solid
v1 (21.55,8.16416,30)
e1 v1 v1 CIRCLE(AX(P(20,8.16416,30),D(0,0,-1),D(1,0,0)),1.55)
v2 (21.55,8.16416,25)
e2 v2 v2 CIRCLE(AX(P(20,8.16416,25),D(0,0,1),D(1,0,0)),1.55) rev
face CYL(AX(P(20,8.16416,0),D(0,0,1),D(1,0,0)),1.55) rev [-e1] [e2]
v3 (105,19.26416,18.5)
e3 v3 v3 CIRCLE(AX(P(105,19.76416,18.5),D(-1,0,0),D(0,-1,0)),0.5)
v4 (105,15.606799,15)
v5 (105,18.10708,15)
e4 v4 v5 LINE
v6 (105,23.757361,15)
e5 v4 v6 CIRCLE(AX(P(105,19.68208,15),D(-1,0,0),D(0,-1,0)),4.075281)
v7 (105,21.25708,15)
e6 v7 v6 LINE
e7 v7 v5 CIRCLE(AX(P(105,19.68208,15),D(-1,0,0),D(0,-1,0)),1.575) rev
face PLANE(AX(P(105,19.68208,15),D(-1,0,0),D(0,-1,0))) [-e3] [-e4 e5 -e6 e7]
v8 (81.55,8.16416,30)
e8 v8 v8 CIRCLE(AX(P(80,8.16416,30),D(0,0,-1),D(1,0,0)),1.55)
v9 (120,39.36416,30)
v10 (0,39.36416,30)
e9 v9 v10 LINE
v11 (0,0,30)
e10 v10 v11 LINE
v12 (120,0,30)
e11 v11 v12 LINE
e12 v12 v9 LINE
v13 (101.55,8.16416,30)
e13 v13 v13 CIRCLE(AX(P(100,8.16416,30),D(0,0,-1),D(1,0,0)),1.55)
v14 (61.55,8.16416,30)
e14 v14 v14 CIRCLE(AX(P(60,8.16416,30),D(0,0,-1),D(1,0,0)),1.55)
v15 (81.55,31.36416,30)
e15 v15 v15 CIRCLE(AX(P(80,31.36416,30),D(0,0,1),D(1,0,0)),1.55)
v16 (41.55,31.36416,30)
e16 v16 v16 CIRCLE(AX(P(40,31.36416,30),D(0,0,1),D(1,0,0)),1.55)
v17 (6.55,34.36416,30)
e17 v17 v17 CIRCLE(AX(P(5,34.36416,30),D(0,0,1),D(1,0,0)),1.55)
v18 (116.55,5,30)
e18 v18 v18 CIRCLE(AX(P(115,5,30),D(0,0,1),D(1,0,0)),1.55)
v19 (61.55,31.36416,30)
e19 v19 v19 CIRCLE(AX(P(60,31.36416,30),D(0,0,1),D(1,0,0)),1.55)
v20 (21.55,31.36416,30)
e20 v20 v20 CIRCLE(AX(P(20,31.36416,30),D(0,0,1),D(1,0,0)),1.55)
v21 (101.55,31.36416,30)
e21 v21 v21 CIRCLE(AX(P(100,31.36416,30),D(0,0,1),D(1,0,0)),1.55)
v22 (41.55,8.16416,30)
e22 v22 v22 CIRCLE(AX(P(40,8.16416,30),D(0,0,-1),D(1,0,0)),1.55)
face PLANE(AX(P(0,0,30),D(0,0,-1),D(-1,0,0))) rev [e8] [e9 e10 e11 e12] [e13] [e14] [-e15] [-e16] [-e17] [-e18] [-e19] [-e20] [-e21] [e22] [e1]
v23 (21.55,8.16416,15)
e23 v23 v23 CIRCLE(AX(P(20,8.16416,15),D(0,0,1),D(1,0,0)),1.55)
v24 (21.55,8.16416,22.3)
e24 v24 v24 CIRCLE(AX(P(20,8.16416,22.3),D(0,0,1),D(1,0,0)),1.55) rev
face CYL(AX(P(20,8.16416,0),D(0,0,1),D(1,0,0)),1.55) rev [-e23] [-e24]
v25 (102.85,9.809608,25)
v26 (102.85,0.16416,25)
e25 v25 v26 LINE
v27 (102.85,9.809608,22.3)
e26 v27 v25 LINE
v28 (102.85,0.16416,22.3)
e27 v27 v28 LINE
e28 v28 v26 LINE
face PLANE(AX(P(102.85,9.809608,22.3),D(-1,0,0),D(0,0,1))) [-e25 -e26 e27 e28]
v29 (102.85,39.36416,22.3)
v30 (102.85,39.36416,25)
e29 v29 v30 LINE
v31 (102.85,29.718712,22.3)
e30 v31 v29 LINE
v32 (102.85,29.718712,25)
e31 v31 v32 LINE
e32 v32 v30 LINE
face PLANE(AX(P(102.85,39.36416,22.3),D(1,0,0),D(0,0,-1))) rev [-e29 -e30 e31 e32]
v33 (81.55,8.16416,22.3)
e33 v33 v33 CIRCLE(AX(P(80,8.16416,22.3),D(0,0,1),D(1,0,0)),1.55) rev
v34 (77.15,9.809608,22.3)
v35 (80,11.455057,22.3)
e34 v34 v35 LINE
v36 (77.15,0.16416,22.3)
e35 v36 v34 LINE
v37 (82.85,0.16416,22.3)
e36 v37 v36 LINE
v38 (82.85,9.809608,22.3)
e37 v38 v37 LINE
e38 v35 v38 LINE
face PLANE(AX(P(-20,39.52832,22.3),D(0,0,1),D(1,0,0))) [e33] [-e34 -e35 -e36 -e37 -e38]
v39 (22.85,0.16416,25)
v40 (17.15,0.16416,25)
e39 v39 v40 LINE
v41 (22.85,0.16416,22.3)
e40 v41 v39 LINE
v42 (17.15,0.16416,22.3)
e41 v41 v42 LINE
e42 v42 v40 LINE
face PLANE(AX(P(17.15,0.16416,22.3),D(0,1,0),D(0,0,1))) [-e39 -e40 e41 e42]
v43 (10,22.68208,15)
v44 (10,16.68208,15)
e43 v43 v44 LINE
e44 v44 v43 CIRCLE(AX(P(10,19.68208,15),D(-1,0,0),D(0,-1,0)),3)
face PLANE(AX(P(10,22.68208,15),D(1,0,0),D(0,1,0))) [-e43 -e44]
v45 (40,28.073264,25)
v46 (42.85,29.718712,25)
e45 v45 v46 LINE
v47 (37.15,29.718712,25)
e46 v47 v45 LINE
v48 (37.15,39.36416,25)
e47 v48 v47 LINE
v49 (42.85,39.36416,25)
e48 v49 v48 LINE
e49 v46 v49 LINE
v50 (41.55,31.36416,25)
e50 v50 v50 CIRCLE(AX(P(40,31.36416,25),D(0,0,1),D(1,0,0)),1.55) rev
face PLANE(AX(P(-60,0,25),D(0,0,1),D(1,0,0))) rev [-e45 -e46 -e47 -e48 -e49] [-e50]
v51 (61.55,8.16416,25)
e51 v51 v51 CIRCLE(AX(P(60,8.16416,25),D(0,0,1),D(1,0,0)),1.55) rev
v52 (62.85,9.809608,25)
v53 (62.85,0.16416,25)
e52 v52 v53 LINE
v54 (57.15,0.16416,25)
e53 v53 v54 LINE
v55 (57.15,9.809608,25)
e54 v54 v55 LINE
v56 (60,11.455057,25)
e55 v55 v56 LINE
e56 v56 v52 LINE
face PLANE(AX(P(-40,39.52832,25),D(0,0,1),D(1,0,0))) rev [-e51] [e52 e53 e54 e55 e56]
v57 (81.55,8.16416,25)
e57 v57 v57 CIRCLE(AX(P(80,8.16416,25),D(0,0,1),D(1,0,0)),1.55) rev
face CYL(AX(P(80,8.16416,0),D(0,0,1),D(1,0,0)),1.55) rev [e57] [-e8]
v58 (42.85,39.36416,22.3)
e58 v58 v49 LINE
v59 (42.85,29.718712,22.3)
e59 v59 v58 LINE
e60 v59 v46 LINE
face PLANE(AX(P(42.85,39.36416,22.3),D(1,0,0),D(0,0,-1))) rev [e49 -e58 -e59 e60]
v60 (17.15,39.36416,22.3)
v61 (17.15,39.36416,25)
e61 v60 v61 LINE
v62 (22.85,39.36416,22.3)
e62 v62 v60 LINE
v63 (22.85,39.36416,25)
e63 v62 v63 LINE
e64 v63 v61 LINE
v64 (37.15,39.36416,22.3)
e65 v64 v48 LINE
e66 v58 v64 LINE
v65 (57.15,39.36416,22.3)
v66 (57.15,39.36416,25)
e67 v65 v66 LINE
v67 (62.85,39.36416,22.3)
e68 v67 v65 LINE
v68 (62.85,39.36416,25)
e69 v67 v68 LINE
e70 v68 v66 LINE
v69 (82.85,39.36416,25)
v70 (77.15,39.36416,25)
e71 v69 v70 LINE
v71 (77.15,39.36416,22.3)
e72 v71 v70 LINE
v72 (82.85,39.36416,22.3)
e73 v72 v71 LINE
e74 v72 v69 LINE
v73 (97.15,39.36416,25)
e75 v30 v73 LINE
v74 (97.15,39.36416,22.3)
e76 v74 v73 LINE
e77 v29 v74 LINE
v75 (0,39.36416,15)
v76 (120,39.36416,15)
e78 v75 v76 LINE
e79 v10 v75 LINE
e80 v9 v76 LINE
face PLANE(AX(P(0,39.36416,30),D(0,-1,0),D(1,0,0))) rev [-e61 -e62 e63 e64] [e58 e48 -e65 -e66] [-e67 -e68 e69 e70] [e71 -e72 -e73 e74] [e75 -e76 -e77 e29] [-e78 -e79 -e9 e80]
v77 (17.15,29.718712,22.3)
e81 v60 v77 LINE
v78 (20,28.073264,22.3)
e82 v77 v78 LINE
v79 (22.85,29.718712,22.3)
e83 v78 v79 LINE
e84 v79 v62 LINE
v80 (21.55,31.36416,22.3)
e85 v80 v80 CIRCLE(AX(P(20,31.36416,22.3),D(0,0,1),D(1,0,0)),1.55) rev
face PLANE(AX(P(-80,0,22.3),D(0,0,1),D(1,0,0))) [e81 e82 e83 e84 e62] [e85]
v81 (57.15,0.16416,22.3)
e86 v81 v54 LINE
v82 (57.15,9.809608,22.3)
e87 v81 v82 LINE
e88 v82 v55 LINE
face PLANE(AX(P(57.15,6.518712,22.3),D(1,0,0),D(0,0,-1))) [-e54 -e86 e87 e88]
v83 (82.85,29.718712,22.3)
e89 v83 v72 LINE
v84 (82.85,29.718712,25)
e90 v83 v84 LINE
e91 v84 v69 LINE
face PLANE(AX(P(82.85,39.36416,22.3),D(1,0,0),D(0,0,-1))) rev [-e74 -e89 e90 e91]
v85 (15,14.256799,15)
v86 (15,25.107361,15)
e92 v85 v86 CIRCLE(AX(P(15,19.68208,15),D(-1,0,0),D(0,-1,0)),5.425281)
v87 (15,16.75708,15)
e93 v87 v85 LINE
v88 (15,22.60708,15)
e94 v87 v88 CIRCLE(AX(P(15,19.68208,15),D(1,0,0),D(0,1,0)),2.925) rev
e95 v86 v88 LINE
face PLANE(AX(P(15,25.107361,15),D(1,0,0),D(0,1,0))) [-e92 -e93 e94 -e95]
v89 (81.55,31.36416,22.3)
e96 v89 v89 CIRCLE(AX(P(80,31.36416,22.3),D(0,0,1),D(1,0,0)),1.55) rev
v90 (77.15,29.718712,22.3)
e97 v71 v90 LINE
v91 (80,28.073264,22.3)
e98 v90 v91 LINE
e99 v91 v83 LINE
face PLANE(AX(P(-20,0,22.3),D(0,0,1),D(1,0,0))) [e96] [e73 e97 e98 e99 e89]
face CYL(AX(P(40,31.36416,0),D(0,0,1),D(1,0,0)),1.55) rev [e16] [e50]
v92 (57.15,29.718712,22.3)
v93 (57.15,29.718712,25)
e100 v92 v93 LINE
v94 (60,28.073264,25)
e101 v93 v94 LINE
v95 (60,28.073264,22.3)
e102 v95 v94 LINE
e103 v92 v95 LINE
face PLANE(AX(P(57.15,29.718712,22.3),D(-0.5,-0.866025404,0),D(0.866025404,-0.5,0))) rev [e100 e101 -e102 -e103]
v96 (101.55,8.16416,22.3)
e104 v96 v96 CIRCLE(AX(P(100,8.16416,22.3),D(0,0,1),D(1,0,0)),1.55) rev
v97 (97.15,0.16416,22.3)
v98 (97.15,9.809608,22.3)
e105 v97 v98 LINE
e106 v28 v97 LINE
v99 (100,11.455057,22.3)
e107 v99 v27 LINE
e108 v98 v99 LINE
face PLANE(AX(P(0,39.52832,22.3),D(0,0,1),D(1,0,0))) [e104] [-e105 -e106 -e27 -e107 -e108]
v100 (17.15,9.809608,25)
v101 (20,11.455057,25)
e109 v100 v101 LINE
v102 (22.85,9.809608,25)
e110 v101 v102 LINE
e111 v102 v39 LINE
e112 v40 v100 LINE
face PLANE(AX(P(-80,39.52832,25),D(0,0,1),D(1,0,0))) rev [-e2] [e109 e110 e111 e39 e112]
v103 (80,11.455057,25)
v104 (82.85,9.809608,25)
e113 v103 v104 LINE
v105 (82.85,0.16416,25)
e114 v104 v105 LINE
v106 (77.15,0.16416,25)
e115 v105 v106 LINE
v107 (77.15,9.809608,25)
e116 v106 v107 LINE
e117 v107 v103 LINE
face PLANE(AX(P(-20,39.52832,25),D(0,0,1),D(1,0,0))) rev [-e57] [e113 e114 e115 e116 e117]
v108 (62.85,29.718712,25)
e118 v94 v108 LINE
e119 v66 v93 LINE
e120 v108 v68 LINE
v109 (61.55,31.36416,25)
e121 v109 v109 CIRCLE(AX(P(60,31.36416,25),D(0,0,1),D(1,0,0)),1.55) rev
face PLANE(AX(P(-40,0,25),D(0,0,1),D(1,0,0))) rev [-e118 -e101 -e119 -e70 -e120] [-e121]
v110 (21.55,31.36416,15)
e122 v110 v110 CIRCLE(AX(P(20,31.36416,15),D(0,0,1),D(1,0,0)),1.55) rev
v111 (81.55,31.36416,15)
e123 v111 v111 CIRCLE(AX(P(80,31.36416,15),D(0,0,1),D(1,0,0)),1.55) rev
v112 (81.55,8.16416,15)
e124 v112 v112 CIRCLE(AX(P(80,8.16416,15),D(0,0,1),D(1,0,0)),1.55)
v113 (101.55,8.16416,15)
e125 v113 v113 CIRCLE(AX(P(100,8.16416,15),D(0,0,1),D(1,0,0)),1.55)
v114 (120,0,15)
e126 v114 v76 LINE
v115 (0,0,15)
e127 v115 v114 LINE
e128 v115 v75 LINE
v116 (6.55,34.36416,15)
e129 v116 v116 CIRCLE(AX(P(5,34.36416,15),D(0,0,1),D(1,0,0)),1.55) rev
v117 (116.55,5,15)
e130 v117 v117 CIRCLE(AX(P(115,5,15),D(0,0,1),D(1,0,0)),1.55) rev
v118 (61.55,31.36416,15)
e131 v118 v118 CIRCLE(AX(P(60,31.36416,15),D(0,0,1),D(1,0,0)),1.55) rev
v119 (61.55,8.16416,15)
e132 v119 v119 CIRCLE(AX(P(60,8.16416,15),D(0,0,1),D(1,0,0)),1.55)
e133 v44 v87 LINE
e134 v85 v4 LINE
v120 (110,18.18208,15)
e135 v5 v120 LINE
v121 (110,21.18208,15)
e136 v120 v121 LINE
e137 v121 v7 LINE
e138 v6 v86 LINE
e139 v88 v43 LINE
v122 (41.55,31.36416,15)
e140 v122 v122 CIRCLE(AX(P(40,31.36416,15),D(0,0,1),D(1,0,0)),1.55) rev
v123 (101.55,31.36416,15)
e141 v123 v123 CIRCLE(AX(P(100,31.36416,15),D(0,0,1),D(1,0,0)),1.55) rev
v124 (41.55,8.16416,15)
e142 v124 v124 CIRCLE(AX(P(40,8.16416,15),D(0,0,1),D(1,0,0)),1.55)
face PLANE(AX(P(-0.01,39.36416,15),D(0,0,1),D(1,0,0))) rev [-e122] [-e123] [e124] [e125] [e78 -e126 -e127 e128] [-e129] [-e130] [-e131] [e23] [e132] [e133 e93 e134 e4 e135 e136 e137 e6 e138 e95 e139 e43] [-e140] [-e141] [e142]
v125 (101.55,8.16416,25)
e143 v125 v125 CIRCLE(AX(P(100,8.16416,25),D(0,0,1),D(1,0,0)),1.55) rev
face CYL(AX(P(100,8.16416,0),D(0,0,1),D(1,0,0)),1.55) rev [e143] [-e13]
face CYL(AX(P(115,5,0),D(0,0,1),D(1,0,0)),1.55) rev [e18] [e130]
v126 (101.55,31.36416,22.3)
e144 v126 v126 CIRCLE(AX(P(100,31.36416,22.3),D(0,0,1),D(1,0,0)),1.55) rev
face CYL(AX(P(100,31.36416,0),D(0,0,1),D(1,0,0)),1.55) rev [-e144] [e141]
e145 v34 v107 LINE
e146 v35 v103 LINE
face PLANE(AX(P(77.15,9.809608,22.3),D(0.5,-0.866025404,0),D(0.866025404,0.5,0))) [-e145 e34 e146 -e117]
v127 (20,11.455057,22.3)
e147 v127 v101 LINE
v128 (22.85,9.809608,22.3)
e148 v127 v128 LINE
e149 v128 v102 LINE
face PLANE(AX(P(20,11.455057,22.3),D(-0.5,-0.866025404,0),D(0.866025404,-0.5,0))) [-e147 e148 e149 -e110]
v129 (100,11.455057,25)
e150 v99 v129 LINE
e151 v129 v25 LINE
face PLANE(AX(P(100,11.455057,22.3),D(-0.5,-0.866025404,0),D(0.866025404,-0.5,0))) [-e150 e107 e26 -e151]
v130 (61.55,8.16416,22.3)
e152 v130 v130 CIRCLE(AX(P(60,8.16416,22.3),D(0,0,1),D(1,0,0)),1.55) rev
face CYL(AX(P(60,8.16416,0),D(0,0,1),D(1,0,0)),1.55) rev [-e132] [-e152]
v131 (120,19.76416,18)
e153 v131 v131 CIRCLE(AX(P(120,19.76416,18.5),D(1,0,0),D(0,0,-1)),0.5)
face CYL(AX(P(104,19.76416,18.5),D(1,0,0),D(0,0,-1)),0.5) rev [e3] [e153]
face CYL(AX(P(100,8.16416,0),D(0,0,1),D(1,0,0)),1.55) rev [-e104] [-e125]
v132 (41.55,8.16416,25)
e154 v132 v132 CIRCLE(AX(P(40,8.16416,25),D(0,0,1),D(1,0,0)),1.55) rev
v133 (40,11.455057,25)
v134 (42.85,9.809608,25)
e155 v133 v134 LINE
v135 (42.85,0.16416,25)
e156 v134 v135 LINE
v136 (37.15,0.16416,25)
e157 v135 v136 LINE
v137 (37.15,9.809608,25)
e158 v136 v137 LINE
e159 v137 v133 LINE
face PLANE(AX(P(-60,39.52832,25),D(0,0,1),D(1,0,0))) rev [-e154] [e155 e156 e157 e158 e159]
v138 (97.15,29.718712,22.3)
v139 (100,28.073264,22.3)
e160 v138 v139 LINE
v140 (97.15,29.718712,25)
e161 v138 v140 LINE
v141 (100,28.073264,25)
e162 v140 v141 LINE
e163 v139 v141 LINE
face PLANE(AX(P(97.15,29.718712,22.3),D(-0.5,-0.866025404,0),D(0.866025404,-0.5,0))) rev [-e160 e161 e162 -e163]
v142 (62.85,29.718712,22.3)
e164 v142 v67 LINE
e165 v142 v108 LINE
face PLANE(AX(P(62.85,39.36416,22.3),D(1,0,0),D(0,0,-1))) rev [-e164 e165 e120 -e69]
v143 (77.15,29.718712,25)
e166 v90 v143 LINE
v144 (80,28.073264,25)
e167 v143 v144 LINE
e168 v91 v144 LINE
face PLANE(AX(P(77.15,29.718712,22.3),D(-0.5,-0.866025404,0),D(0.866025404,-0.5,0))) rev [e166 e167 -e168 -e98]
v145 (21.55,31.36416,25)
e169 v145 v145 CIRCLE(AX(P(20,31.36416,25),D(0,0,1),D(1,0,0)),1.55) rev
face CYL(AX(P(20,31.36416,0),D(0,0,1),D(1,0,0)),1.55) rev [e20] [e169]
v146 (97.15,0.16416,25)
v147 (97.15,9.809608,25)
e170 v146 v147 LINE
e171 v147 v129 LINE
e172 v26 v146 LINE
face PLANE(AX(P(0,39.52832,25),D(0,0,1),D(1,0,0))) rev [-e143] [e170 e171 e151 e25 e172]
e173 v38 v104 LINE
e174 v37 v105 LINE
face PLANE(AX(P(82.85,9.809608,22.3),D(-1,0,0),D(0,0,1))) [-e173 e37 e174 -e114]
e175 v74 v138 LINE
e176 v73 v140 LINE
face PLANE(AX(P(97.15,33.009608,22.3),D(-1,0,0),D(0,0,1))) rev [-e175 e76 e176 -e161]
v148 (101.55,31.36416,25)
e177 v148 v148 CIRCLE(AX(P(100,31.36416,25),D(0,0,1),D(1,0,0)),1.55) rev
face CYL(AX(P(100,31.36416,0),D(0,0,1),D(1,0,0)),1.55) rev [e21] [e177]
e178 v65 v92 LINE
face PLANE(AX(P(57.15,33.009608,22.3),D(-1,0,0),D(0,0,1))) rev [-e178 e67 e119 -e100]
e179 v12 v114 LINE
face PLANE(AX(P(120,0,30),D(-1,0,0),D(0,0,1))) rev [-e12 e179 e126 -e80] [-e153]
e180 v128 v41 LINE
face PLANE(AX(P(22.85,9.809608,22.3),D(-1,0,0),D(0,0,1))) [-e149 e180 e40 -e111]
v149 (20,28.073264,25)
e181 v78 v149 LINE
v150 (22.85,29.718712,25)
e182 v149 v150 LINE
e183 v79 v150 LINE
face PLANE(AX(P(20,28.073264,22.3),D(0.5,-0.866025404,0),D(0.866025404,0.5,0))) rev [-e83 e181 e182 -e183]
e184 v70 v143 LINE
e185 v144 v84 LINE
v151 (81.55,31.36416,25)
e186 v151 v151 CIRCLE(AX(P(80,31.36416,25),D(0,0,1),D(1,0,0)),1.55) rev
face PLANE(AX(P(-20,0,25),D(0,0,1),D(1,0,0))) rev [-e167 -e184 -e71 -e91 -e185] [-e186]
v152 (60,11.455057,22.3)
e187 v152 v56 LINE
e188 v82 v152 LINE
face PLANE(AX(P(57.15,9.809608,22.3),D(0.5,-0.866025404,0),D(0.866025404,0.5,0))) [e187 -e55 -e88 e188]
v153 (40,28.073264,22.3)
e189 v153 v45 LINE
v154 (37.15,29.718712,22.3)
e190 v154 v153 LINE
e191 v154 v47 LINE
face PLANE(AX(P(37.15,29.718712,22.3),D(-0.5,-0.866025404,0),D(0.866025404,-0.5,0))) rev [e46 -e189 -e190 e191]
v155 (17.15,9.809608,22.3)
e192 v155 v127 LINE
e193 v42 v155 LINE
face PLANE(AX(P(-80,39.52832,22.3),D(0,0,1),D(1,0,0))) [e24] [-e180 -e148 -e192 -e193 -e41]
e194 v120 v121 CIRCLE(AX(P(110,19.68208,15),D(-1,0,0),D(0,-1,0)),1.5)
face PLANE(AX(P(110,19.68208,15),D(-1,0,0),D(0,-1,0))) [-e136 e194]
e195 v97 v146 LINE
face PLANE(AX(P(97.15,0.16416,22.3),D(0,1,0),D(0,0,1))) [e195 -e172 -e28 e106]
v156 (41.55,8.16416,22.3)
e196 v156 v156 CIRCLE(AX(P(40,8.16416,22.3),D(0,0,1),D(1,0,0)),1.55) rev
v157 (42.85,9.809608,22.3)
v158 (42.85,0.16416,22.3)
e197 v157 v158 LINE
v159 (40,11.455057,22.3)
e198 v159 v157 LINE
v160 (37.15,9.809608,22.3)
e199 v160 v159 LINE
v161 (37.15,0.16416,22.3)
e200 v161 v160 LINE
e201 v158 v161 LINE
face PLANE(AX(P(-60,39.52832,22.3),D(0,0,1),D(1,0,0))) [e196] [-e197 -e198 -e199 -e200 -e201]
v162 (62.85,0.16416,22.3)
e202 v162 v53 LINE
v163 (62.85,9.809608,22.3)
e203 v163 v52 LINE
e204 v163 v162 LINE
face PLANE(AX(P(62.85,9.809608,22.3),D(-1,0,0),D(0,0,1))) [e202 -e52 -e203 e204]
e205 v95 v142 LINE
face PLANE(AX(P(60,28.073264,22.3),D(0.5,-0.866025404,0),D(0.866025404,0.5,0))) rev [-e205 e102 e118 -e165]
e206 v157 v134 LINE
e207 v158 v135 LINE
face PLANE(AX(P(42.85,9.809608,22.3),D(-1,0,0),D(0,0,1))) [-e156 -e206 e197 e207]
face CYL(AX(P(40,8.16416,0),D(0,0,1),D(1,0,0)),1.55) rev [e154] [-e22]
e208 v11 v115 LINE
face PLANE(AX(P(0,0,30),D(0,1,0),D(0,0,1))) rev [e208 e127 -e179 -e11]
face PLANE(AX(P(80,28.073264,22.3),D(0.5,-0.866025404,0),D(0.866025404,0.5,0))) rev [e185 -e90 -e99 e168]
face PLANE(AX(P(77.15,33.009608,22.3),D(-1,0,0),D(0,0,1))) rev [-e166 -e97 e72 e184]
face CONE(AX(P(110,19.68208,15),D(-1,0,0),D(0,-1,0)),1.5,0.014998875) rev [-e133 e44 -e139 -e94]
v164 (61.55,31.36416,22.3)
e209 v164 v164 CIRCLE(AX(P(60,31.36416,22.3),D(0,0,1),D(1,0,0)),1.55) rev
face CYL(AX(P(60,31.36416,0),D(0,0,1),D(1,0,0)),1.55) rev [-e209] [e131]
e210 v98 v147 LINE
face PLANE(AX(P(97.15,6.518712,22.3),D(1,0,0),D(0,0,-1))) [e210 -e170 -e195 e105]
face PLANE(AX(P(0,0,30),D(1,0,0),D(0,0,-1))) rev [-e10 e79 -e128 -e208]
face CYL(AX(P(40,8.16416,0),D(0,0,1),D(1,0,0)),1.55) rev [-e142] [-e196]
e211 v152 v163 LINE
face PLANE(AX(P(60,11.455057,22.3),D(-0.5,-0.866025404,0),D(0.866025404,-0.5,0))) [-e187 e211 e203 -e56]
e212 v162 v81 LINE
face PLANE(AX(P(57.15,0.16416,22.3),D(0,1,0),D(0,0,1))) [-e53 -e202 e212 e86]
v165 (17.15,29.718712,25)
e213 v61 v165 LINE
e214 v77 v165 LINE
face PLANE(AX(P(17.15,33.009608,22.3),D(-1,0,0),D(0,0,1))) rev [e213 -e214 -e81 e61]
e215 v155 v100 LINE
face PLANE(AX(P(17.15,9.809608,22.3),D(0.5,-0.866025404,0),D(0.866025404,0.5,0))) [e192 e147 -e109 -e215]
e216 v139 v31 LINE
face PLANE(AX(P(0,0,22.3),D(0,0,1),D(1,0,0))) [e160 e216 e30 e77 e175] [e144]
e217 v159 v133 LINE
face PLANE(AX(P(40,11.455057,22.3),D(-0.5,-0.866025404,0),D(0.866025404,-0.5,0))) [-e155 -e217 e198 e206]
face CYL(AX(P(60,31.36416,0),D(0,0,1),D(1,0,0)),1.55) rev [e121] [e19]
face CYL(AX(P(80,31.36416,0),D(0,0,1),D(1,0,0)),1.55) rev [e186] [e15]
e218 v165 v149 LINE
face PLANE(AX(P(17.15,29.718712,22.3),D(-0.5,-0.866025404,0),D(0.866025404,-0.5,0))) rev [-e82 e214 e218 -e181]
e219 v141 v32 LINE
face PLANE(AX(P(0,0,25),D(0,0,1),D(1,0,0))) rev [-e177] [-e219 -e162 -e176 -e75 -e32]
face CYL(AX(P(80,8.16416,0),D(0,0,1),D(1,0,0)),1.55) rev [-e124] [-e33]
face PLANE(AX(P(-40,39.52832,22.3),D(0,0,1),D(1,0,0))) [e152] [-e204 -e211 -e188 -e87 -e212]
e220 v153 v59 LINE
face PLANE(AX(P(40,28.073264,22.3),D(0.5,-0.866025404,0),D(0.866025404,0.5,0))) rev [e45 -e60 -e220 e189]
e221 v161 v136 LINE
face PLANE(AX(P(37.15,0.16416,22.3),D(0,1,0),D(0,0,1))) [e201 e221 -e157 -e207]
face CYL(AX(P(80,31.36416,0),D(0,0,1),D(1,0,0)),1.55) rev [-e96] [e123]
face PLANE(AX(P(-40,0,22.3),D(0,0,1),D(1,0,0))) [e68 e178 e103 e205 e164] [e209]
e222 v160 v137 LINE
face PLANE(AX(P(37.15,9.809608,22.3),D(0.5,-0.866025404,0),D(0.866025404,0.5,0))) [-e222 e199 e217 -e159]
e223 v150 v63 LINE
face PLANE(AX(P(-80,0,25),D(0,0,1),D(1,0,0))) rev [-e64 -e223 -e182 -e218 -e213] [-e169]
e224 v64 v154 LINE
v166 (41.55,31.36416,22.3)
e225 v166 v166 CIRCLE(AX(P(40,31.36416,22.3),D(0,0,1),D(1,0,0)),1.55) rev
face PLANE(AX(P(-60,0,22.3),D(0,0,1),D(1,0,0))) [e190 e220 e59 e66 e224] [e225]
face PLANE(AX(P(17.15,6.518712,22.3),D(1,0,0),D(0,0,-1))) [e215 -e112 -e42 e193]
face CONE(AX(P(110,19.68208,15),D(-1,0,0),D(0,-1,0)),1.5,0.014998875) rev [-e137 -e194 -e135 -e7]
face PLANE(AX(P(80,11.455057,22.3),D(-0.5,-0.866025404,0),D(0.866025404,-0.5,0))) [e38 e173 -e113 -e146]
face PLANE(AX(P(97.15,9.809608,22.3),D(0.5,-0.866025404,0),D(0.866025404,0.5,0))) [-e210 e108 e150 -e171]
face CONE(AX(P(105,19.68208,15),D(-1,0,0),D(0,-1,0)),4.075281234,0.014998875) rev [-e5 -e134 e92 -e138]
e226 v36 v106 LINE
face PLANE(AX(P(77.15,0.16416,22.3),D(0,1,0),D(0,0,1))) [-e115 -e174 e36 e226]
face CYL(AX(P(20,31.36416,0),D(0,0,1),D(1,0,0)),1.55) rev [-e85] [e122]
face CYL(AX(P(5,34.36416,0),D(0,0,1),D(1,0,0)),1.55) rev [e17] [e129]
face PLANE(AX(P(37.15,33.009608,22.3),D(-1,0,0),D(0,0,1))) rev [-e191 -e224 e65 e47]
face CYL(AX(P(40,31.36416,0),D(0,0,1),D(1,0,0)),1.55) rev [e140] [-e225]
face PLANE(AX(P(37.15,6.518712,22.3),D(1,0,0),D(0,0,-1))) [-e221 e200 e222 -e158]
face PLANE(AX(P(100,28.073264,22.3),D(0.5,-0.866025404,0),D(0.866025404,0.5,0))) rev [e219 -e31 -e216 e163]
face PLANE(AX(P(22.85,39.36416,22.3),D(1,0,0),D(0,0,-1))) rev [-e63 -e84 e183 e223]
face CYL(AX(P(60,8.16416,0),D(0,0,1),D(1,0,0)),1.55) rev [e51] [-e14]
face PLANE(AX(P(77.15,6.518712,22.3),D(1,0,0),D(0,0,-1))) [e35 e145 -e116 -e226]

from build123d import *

# Parameters (mm, degrees)
SKIZZE2_W                        = 120
SKIZZE2_H                        = 39.364160046
AUFSATZ_LINEAR_AUSTRAGEN1_DEPTH  = 30
SKIZZE24_R                       = 1.55
SCHNITT_LINEAR_AUSTRAGEN4_DEPTH  = 130.805766806
SKIZZE46_R                       = 2.85
SCHNITT_LINEAR_AUSTRAGEN15_DEPTH = 10
SCHNITT_LINEAR_START             = -5
SCHNITT_LINEAR_AUSTRAGEN25_DEPTH = 2.7
LINEARES_MUSTER1_COUNT           = 5
LINEARES_MUSTER1_PITCH           = 20
SPIEGELN2_COPY_1_SKETCH_R        = 2.85
SPIEGELN2_COPY_1_DEPTH           = 10
SPIEGELN2_COPY_2_SKETCH_R        = 2.85
SPIEGELN2_COPY_2_DEPTH           = 10
SPIEGELN2_COPY_3_SKETCH_R        = 2.85
SPIEGELN2_COPY_3_DEPTH           = 10
SPIEGELN2_COPY_4_SKETCH_R        = 2.85
SPIEGELN2_COPY_4_DEPTH           = 10
SPIEGELN2_START                  = -5
SPIEGELN2_COPY_5_DEPTH           = 2.7
SPIEGELN2_COPY_6_DEPTH           = 2.7
SPIEGELN2_COPY_7_DEPTH           = 2.7
SPIEGELN2_COPY_8_DEPTH           = 2.7
SKIZZE51_R                       = 1.55
SCHNITT_LINEAR_AUSTRAGEN26_DEPTH = 130.805766806
SKIZZE67_R                       = 0.5
SCHNITT_LINEAR_AUSTRAGEN28_DEPTH = 16
SKIZZE68_R                       = 0.65
SCHNITT_LINEAR_AUSTRAGEN30_DEPTH = 16
SKIZZE70_R                       = 2
SCHNITT_LINEAR_AUSTRAGEN31_DEPTH = 6
ABSPALTEN3_OUTLINE_W             = 120
ABSPALTEN3_OUTLINE_H             = 39.364160046
ABSPALTEN3_OUTLINE_R             = 1.55
ABSPALTEN3_DEPTH                 = 15


# Read off the part's stored shape, not the designer's step: Abspalten3
with BuildPart() as part:
    # Skizze2 → Aufsatz-Linear austragen1 (new body)
    with BuildSketch(Plane.XY):
        with Locations((60, 19.682080023)):
            Rectangle(SKIZZE2_W, SKIZZE2_H)
    extrude(amount=AUFSATZ_LINEAR_AUSTRAGEN1_DEPTH)

    # Skizze24 → Schnitt-Linear austragen4 (cut, through all)
    with BuildSketch(Plane.XY.offset(30)):
        with Locations((20, 31.364160046)):
            Circle(SKIZZE24_R)
        with Locations((40, 31.364160046)):
            Circle(SKIZZE24_R)
        with Locations((60, 31.364160046)):
            Circle(SKIZZE24_R)
        with Locations((80, 31.364160046)):
            Circle(SKIZZE24_R)
        with Locations((100, 31.364160046)):
            Circle(SKIZZE24_R)
    schnitt_linear_austragen4 = extrude(amount=-SCHNITT_LINEAR_AUSTRAGEN4_DEPTH, mode=Mode.SUBTRACT)

    # Skizze46 → Schnitt-Linear austragen15 (cut)
    with BuildSketch(Plane(origin=(0, 0, 0), x_dir=(-1, 0, 0), z_dir=(0, 0, -1))):
        with Locations((-100, 31.364160046)):
            Circle(SKIZZE46_R)
    schnitt_linear_austragen15 = extrude(amount=-SCHNITT_LINEAR_AUSTRAGEN15_DEPTH, mode=Mode.SUBTRACT)

    # Skizze50 → Schnitt-Linear austragen25 (cut)
    with BuildSketch(Plane.XY.offset(30).offset(SCHNITT_LINEAR_START)):
        Polygon((97.15, 33.009608314), (97.15, 39.364160046), (102.85, 39.364160046), (102.85, 33.009608314), (102.85, 29.718711779), (100, 28.073263512), (97.15, 29.718711779), align=None)
    schnitt_linear_austragen25 = extrude(amount=-SCHNITT_LINEAR_AUSTRAGEN25_DEPTH, mode=Mode.SUBTRACT)

    # Lineares Muster1: Schnitt-Linear austragen15, Schnitt-Linear austragen25 ×5
    with Locations(*[(-i * LINEARES_MUSTER1_PITCH, 0, 0) for i in range(1, LINEARES_MUSTER1_COUNT)]):
        add(schnitt_linear_austragen15, mode=Mode.SUBTRACT)
        add(schnitt_linear_austragen25, mode=Mode.SUBTRACT)

    # Spiegeln2: Schnitt-Linear austragen15, Schnitt-Linear austragen25 across plane
    add(schnitt_linear_austragen15.mirror(Plane.ZX.offset(19.764160046)), mode=Mode.SUBTRACT)
    add(schnitt_linear_austragen25.mirror(Plane.ZX.offset(19.764160046)), mode=Mode.SUBTRACT)

    # Spiegeln2 copy 1 sketch → Spiegeln2 copy 1 (cut)
    with BuildSketch(Plane(origin=(-20, 39.528320093, 0), x_dir=(-1, 0, 0), z_dir=(0, 0, -1))):
        with Locations((-100, -31.364160046)):
            Circle(SPIEGELN2_COPY_1_SKETCH_R)
    extrude(amount=-SPIEGELN2_COPY_1_DEPTH, mode=Mode.SUBTRACT)

    # Spiegeln2 copy 2 sketch → Spiegeln2 copy 2 (cut)
    with BuildSketch(Plane(origin=(-40, 39.528320093, 0), x_dir=(-1, 0, 0), z_dir=(0, 0, -1))):
        with Locations((-100, -31.364160046)):
            Circle(SPIEGELN2_COPY_2_SKETCH_R)
    extrude(amount=-SPIEGELN2_COPY_2_DEPTH, mode=Mode.SUBTRACT)

    # Spiegeln2 copy 3 sketch → Spiegeln2 copy 3 (cut)
    with BuildSketch(Plane(origin=(-60, 39.528320093, 0), x_dir=(-1, 0, 0), z_dir=(0, 0, -1))):
        with Locations((-100, -31.364160046)):
            Circle(SPIEGELN2_COPY_3_SKETCH_R)
    extrude(amount=-SPIEGELN2_COPY_3_DEPTH, mode=Mode.SUBTRACT)

    # Spiegeln2 copy 4 sketch → Spiegeln2 copy 4 (cut)
    with BuildSketch(Plane(origin=(-80, 39.528320093, 0), x_dir=(-1, 0, 0), z_dir=(0, 0, -1))):
        with Locations((-100, -31.364160046)):
            Circle(SPIEGELN2_COPY_4_SKETCH_R)
    extrude(amount=-SPIEGELN2_COPY_4_DEPTH, mode=Mode.SUBTRACT)

    # Spiegeln2 copy 5 sketch → Spiegeln2 copy 5 (cut)
    with BuildSketch(Plane(origin=(-20, 39.528320093, 30), x_dir=(1, 0, 0), z_dir=(0, 0, 1)).offset(SPIEGELN2_START)):
        Polygon((97.15, -33.009608314), (97.15, -39.364160046), (102.85, -39.364160046), (102.85, -33.009608314), (102.85, -29.718711779), (100, -28.073263512), (97.15, -29.718711779), align=None)
    extrude(amount=-SPIEGELN2_COPY_5_DEPTH, mode=Mode.SUBTRACT)

    # Spiegeln2 copy 6 sketch → Spiegeln2 copy 6 (cut)
    with BuildSketch(Plane(origin=(-40, 39.528320093, 30), x_dir=(1, 0, 0), z_dir=(0, 0, 1)).offset(SPIEGELN2_START)):
        Polygon((97.15, -33.009608314), (97.15, -39.364160046), (102.85, -39.364160046), (102.85, -33.009608314), (102.85, -29.718711779), (100, -28.073263512), (97.15, -29.718711779), align=None)
    extrude(amount=-SPIEGELN2_COPY_6_DEPTH, mode=Mode.SUBTRACT)

    # Spiegeln2 copy 7 sketch → Spiegeln2 copy 7 (cut)
    with BuildSketch(Plane(origin=(-60, 39.528320093, 30), x_dir=(1, 0, 0), z_dir=(0, 0, 1)).offset(SPIEGELN2_START)):
        Polygon((97.15, -33.009608314), (97.15, -39.364160046), (102.85, -39.364160046), (102.85, -33.009608314), (102.85, -29.718711779), (100, -28.073263512), (97.15, -29.718711779), align=None)
    extrude(amount=-SPIEGELN2_COPY_7_DEPTH, mode=Mode.SUBTRACT)

    # Spiegeln2 copy 8 sketch → Spiegeln2 copy 8 (cut)
    with BuildSketch(Plane(origin=(-80, 39.528320093, 30), x_dir=(1, 0, 0), z_dir=(0, 0, 1)).offset(SPIEGELN2_START)):
        Polygon((97.15, -33.009608314), (97.15, -39.364160046), (102.85, -39.364160046), (102.85, -33.009608314), (102.85, -29.718711779), (100, -28.073263512), (97.15, -29.718711779), align=None)
    extrude(amount=-SPIEGELN2_COPY_8_DEPTH, mode=Mode.SUBTRACT)

    # Spiegeln3: Schnitt-Linear austragen4 across plane
    add(schnitt_linear_austragen4.mirror(Plane.ZX.offset(19.764160046)), mode=Mode.SUBTRACT)

    # Skizze51 → Schnitt-Linear austragen26 (cut, through all)
    with BuildSketch(Plane.XY.offset(30)):
        with Locations((5, 34.364160046)):
            Circle(SKIZZE51_R)
        with Locations((115, 5)):
            Circle(SKIZZE51_R)
    extrude(amount=-SCHNITT_LINEAR_AUSTRAGEN26_DEPTH, mode=Mode.SUBTRACT)

    # Skizze66 → Schnitt-Rotation5 (revolve, cut)
    with BuildSketch(Plane.XY.offset(15), mode=Mode.PRIVATE) as schnitt_rotation5_sk:
        Polygon((110, 19.682080023), (110, 21.182080023), (10, 22.682080023), (10, 19.682080023), align=None)
        Polygon((105, 19.682080023), (105, 23.757361257), (15, 25.107361257), (15, 19.682080023), align=None)
    revolve(schnitt_rotation5_sk.sketch.rotate(Axis((10, 19.682080023, 15), (1, 0, 0)), 180), axis=Axis((10, 19.682080023, 15), (1, 0, 0)), mode=Mode.SUBTRACT)

    # Skizze67 → Schnitt-Linear austragen28 (cut)
    with BuildSketch(Plane(origin=(120, 0, 0), x_dir=(0, 0, -1), z_dir=(1, 0, 0))):
        with Locations((-18.5, 19.764160046)):
            Circle(SKIZZE67_R)
    schnitt_linear_austragen28 = extrude(amount=-SCHNITT_LINEAR_AUSTRAGEN28_DEPTH, mode=Mode.SUBTRACT)

    # Spiegeln5: Schnitt-Linear austragen28 across plane
    add(schnitt_linear_austragen28.mirror(Plane.XY.offset(15)), mode=Mode.SUBTRACT)

    # Skizze68 → Schnitt-Linear austragen30 (cut)
    with BuildSketch(Plane.ZY):
        with Locations((10.25, 19.764160046)):
            Circle(SKIZZE68_R)
    extrude(amount=-SCHNITT_LINEAR_AUSTRAGEN30_DEPTH, mode=Mode.SUBTRACT)

    # Skizze70 → Schnitt-Linear austragen31 (cut)
    with BuildSketch(Plane.ZY):
        with Locations((10.25, 19.764160046)):
            Circle(SKIZZE70_R)
    extrude(amount=-SCHNITT_LINEAR_AUSTRAGEN31_DEPTH, mode=Mode.SUBTRACT)

    # Abspalten3 outline → Abspalten3 (cut)
    with BuildSketch(Plane.XY):
        with Locations((60, 19.682080023)):
            Rectangle(ABSPALTEN3_OUTLINE_W, ABSPALTEN3_OUTLINE_H)
        with Locations((115, 5)):
            Circle(ABSPALTEN3_OUTLINE_R, mode=Mode.SUBTRACT)
        with Locations((5, 34.364160046)):
            Circle(ABSPALTEN3_OUTLINE_R, mode=Mode.SUBTRACT)
        with Locations((20, 8.164160046)):
            Circle(ABSPALTEN3_OUTLINE_R, mode=Mode.SUBTRACT)
        with Locations((40, 8.164160046)):
            Circle(ABSPALTEN3_OUTLINE_R, mode=Mode.SUBTRACT)
        with Locations((60, 8.164160046)):
            Circle(ABSPALTEN3_OUTLINE_R, mode=Mode.SUBTRACT)
        with Locations((80, 8.164160046)):
            Circle(ABSPALTEN3_OUTLINE_R, mode=Mode.SUBTRACT)
        with Locations((100, 8.164160046)):
            Circle(ABSPALTEN3_OUTLINE_R, mode=Mode.SUBTRACT)
        with Locations((20, 31.364160046)):
            Circle(ABSPALTEN3_OUTLINE_R, mode=Mode.SUBTRACT)
        with Locations((40, 31.364160046)):
            Circle(ABSPALTEN3_OUTLINE_R, mode=Mode.SUBTRACT)
        with Locations((60, 31.364160046)):
            Circle(ABSPALTEN3_OUTLINE_R, mode=Mode.SUBTRACT)
        with Locations((80, 31.364160046)):
            Circle(ABSPALTEN3_OUTLINE_R, mode=Mode.SUBTRACT)
        with Locations((100, 31.364160046)):
            Circle(ABSPALTEN3_OUTLINE_R, mode=Mode.SUBTRACT)
    extrude(amount=ABSPALTEN3_DEPTH, mode=Mode.SUBTRACT)


solid = part.part
